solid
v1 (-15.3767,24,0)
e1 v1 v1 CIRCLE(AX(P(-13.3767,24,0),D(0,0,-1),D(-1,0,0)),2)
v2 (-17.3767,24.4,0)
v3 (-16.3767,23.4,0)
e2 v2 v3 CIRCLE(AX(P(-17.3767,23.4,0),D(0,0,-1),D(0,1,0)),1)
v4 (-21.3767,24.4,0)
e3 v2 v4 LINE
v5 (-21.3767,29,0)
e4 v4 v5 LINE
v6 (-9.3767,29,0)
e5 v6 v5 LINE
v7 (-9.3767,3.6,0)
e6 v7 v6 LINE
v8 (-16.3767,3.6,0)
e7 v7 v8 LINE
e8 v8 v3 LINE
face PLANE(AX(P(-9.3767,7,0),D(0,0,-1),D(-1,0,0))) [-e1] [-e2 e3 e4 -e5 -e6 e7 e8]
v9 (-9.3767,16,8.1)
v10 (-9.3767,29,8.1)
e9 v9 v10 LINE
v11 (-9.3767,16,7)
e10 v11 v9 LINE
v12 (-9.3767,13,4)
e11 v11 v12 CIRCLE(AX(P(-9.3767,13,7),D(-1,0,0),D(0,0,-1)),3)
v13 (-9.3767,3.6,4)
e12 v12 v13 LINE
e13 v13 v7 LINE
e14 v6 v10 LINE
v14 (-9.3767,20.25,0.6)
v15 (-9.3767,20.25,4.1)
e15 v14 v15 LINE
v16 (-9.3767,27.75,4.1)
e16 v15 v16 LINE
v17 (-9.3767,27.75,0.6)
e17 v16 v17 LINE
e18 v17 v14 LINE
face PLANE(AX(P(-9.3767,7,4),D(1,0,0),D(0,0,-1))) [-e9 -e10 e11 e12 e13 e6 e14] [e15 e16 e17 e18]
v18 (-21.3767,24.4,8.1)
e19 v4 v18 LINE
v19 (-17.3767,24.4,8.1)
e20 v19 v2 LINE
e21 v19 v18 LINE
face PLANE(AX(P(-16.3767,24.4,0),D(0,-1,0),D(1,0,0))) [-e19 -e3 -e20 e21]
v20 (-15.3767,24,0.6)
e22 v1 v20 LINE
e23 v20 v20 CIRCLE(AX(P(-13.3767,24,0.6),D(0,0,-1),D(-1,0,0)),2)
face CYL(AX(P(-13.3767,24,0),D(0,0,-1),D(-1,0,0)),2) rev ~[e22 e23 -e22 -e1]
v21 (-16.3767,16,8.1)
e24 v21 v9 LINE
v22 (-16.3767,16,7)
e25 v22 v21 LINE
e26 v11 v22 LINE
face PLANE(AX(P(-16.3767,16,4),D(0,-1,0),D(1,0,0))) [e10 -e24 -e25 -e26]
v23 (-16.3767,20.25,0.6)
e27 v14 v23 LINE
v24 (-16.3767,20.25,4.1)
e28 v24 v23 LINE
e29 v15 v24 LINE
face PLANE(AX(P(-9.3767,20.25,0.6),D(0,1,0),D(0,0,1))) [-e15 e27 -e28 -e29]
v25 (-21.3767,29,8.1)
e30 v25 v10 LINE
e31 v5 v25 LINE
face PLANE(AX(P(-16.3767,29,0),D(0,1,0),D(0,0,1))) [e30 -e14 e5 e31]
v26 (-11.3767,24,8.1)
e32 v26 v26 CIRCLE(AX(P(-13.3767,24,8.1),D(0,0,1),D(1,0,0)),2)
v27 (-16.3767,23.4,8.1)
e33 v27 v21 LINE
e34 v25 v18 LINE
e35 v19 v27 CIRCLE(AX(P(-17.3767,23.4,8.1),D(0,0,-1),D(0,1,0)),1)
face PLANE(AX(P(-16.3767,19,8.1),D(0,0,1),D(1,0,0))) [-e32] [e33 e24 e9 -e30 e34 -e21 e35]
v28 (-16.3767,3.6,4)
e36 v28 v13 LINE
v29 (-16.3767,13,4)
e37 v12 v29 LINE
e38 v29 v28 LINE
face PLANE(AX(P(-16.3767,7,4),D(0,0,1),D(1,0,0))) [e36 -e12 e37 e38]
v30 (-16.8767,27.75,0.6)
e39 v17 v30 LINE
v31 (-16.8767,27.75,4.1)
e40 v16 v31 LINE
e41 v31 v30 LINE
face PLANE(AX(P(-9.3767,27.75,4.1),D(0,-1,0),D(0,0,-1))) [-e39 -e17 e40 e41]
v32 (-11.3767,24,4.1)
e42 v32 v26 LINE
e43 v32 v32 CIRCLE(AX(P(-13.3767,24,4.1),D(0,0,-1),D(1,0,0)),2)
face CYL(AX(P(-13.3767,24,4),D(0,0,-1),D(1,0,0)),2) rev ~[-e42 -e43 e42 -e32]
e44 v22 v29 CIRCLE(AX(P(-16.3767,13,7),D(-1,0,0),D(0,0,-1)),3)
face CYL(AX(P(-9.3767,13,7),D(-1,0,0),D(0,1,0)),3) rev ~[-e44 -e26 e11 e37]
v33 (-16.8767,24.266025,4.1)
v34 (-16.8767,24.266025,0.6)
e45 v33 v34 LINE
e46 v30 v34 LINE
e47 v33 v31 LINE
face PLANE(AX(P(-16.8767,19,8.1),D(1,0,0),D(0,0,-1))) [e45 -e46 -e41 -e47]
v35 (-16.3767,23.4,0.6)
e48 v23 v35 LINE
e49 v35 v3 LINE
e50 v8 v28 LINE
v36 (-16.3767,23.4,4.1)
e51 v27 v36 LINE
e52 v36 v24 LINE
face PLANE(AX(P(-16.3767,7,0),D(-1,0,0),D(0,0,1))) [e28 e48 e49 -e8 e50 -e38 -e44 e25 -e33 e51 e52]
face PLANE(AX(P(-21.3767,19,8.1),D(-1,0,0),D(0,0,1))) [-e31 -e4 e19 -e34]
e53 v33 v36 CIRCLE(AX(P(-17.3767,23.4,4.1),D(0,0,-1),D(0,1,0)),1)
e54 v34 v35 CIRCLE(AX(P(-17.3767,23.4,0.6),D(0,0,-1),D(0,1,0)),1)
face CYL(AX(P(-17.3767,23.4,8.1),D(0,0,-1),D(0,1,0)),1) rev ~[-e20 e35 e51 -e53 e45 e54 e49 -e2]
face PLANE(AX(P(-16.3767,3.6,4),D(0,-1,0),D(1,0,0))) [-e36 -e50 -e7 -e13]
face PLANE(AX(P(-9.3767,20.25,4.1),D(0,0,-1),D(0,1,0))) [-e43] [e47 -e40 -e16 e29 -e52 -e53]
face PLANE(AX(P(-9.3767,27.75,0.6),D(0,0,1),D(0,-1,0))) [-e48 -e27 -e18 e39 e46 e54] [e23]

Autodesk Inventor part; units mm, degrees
ref_plane "YZ Plane" through (0, 0, 0) normal (1, 0, 0) x (0, 1, 0)
sketch "Sketch1" plane through (0, 0, 0) normal (0, 0, 1) x (1, 0, 0)
  line L0 (5.8439, -14.5) -> (6.8, -14.5) projected
  line L1 (6.8, -5.5) -> (6.8, -14.5) projected
  line L2 (6.8, -5.5) -> (5.8439, -5.5) projected
  arc A0 (5.8439, -3.1) -> (5.8439, -5.5) centre (4, -4.3) ccw projected
  line L3 (5.8439, -3.1) -> (6.8, -3.1) projected
  line L4 (6.8, 0) -> (6.8, -3.1) projected
  line L5 (0, 0) -> (6.8, 0) projected
  line L6 (0, -20) -> (0, 0) projected
  line L7 (0, -20) -> (6.8, -20) projected
  line L8 (6.8, -16.9) -> (6.8, -20) projected
  line L9 (6.8, -16.9) -> (5.8439, -16.9) projected
  arc A1 (5.8439, -14.5) -> (5.8439, -16.9) centre (4, -15.7) ccw projected
  line L10 (-47.1, -14.5) -> (-46.1439, -14.5) projected
  arc A2 (-46.1439, -16.9) -> (-46.1439, -14.5) centre (-44.3, -15.7) ccw projected
  line L11 (-46.1439, -16.9) -> (-47.1, -16.9) projected
  line L12 (-47.1, -16.9) -> (-47.1, -20) projected
  line L13 (-40.3, -20) -> (-47.1, -20) projected
  line L14 (-40.3, 0) -> (-40.3, -20) projected
  line L15 (-40.3, 0) -> (-47.1, 0) projected
  line L16 (-47.1, 0) -> (-47.1, -3.1) projected
  line L17 (-47.1, -3.1) -> (-46.1439, -3.1) projected
  arc A3 (-46.1439, -5.5) -> (-46.1439, -3.1) centre (-44.3, -4.3) ccw projected
  line L18 (-46.1439, -5.5) -> (-47.1, -5.5) projected
  line L19 (-47.1, -5.5) -> (-47.1, -14.5) projected
extrude "Extrusion1" add sketch "Sketch1" along normal blind 4
sketch "Sketch2" plane through (0, 0, 0) normal (0, 1, 0) x (1, 0, 0)
  line L0 (0, 0) -> (6.8, 0) projected
  line L1 (0, 0) -> (0, -4) projected
  line L2 (6.8, -4) -> (0, -4) projected
  line L3 (6.8, 0) -> (6.8, -4) projected
  line L4 (-47.1, 0) -> (-47.1, -4) projected
  line L5 (-40.3, -4) -> (-47.1, -4) projected
  line L6 (6.8, 0) -> (-47.1, 0)
  line L7 (-47.1, 0) -> (-47.1, -4)
  line L8 (-47.1, -4) -> (6.8, -4)
  line L9 (6.8, -4) -> (6.8, 0)
extrude "Extrusion2" add sketch "Sketch2" along normal blind 4 contours L1 L8 L5 L4 L6
sketch "Sketch3" plane through (0, 0, 4) normal (1, 0, 0) x (0, 0, -1)
  line L0 (4, 0) -> (0, 0) projected
  line L1 (4, 4) -> (4, 0) projected
  line L2 (0, 4) -> (4, 4) projected
  line L3 (0, 0) -> (0, 4) projected
extrude "Extrusion3" add sketch "Sketch3" along normal up to surface (6.8 mm away)
sketch "Sketch4" plane through (0, 4, 0) normal (0, 1, 0) x (1, 0, 0)
  line L0 (6.8, 0) -> (-47.1, 0) projected
  line L1 (-47.1, -4) -> (6.8, -4) projected
  line L2 (-9.3767, -8.1) -> (-9.3767, -13.1) construction
  line L3 (-21.8189, -8.1) -> (-9.3767, -8.1) construction
  arc A0 (-17.3767, -8.1) -> (-40.8, 16.4941) centre (-48.3, -14.1) ccw construction
  line L4 (-9.3767, -4) -> (-16.3767, -4) construction
  line L5 (-16.3767, -4) -> (-16.3767, -8.1) construction
  line L6 (-16.3767, -8.1) -> (-9.3767, -8.1) construction
  line L7 (-9.3767, -8.1) -> (-9.3767, -4) construction
  line L8 (-9.3767, -4) -> (-16.3767, -4)
  line L9 (-16.3767, -4) -> (-16.3767, 0)
  line L10 (-16.3767, 0) -> (-9.3767, 0)
  line L11 (-9.3767, 0) -> (-9.3767, -4)
  point P0 (0, 0)
  dimension "d6" = 7
ref_plane "Work Plane1" through (-21.8189, 29, 8.1) normal (0, 1, 0) x (0, 0, 1)
extrude "Extrusion4" add sketch "Sketch4" along normal up to surface (25 mm away)
sketch "Sketch5" plane through (0, 0, 4) normal (0, 0, 1) x (1, 0, 0)
  circle A0 centre (-13.3767, 24) radius 2 construction
  line L0 (-21.8189, 24) -> (-17.3767, 24) construction
  line L1 (-21.8189, 24) -> (-21.8189, 29) construction
  line L2 (-21.8189, 29) -> (-9.3767, 29) construction
  line L3 (-9.3767, 19) -> (-9.3767, 29) construction
  line L4 (-17.3767, 19) -> (-9.3767, 19) construction
  line L5 (-17.3767, 24) -> (-17.3767, 19) construction
  line L6 (-9.3767, 19) -> (-16.3767, 19) construction
  line L7 (-16.3767, 19) -> (-16.3767, 29) construction
  line L8 (-16.3767, 29) -> (-9.3767, 29) construction
  line L9 (-9.3767, 29) -> (-9.3767, 19) construction
  line L10 (-9.3767, 19) -> (-16.3767, 19)
  line L11 (-16.3767, 19) -> (-16.3767, 29)
  line L12 (-16.3767, 29) -> (-9.3767, 29)
  line L13 (-9.3767, 29) -> (-9.3767, 19)
  circle A1 centre (-13.3767, 24) radius 2
ref_plane "Work Plane2" through (-21.8189, 19, 8.1) normal (0, 0, -1) x (0, 1, 0)
extrude "Extrusion5" add sketch "Sketch5" along normal up to surface (4.1 mm away)
fillet "Fillet2" radius 2 2 edges at (-9.3767, 4, 2) (-16.3767, 4, 2)
sketch "Sketch6" plane through (-16.3767, 19, 8.1) normal (-1, 0, 0) x (0, 0, 1)
  line L0 (0, 5) -> (-24.5941, 5) construction
  line L1 (0, 0) -> (-24.5941, 0) construction
  line L2 (-8.1, 10) -> (0.5132, 10) construction
  line L3 (0.5132, 10) -> (0.5132, 5) construction
  line L4 (0.5132, 5) -> (-8.1, 5) construction
  line L5 (-8.1, 5) -> (-8.1, 10) construction
  line L6 (-8.1, 10) -> (0, 10)
  line L7 (0, 10) -> (0, 5)
  line L8 (0, 5) -> (-8.1, 5)
  line L9 (-8.1, 5) -> (-8.1, 10)
  point P0 (-8.1, -19)
extrude "Extrusion6" add sketch "Sketch6" along normal blind 5
sketch "Sketch7" plane through (-16.3767, 24, 0) normal (0, -1, 0) x (1, 0, 0)
  line L0 (0, 8.1) -> (0, 0) projected
  line L1 (0, 8.1) -> (-5, 8.1) projected
  line L2 (-5, 0) -> (-5, 8.1) projected
  line L3 (0, 0) -> (-5, 0) projected
  point P0 (16.3767, 0)
extrude "Extrusion7" cut sketch "Sketch7" against normal blind 0.4
sketch "Sketch8" plane through (0, 0, 0) normal (0, 0, -1) x (-1, 0, 0)
  circle A0 centre (13.3767, 24) radius 2 construction
  circle A1 centre (13.3767, 24) radius 2 projected
extrude "Extrusion8" cut sketch "Sketch8" against normal blind 4
fillet "Fillet3" radius 1 1 edges at (-16.3767, 24.4, 4.05)
sketch "Sketch9" plane through (-9.3767, 19, 8.1) normal (1, 0, 0) x (0, 0, -1)
  line L0 (0, 0) -> (0, 10) projected
  line L1 (8.1, 7) -> (0, 7) construction
  line L2 (8.1, 3) -> (0, 3) construction
  line L3 (24.5941, 5) -> (0, 5) construction
  line L4 (-5, 5) -> (0, 5) construction
  line L5 (4, 8.75) -> (7.5, 8.75)
  line L6 (7.5, 8.75) -> (7.5, 1.25)
  line L7 (7.5, 1.25) -> (4, 1.25)
  line L8 (4, 1.25) -> (4, 8.75)
  point P0 (8.1, -19)
  point P1 (4, 5)
  dimension "d20" = 3.5
  dimension "d21" = 7.5
  dimension "d22" = 4
extrude "Extrusion9" cut sketch "Sketch9" against normal blind 7.5
sketch "Sketch10" plane through (-16.3767, 19, 4) normal (0, -1, 0) x (1, 0, 0)
  line L0 (0, 4.1) -> (7, 4.1) projected
  line L1 (0, 0) -> (0, 4.1) projected
  line L2 (7, 0) -> (0, 0) projected
  line L3 (7, 0) -> (7, 4.1) projected
  point P0 (16.3767, -4)
extrude "Extrusion10" add sketch "Sketch10" along normal blind 3
fillet "Fillet4" radius 3 1 edges at (-12.8767, 16, 4)
sketch "Sketch11" plane through (0, 0, 0) normal (0, -1, 0) x (1, 0, 0)
  line L0 (-40.3, 0) -> (-40.3, 4) projected
  line L1 (0, 0) -> (-40.3, 0) projected
  line L2 (0, 0) -> (0, 4) projected
  line L3 (-40.3, 4) -> (0, 4) projected
extrude "Extrusion11" cut sketch "Sketch11" against normal blind 0.3
sketch "Sketch12" plane through (0, -20, 0) normal (-1, 0, 0) x (0, 0, 1)
  line L0 (0, 0) -> (0, 20.3) projected
  line L1 (0, 0) -> (4, 0) projected
  line L2 (4, 20.3) -> (4, 0) projected
  line L3 (4, 20.3) -> (0, 20.3) projected
  point P0 (0, 20)
extrude "Extrusion12" cut sketch "Sketch12" against normal blind 0.3
sketch "Sketch13" plane through (-40.3, -20, 4) normal (1, 0, 0) x (0, 0, -1)
  line L0 (4, 0) -> (4, 20.3) projected
  line L1 (4, 20.3) -> (0, 20.3) projected
  line L2 (0, 0) -> (0, 20.3) projected
  line L3 (4, 0) -> (0, 0) projected
  point P0 (4, 20)
extrude "Extrusion13" cut sketch "Sketch13" against normal blind 0.3
fillet "Fillet5" radius 1 2 edges at (6.8, 4, 2) (-47.1, 4, 2)
sketch "Sketch15" plane through (0, 0, 4) normal (0, 0, 1) x (1, 0, 0)
  line L0 (-46.1, 4) -> (-18.3767, 4) projected
  line L1 (13.0867, -24.6558) -> (-51.2218, -24.6558)
  line L2 (-51.2218, -24.6558) -> (-51.2218, 7)
  line L3 (-51.2218, 7) -> (13.0867, 7)
  line L4 (13.0867, 7) -> (13.0867, -24.6558)
  point P0 (0, 0)
  dimension "d35" = 3
extrude "Extrusion14" cut sketch "Sketch15" against normal through all
sketch "Sketch16" plane through (-16.3767, 7, 4) normal (0, -1, 0) x (1, 0, 0)
  line L0 (7, 0) -> (7, -4) projected
  line L1 (0, 0) -> (7, 0) projected
  line L2 (0, -4) -> (0, 0) projected
  line L3 (7, -4) -> (0, -4) projected
  point P0 (16.3767, -4)
extrude "Extrusion15" add sketch "Sketch16" along normal blind 3.4
properties part number "MG996RBracketBottom"
